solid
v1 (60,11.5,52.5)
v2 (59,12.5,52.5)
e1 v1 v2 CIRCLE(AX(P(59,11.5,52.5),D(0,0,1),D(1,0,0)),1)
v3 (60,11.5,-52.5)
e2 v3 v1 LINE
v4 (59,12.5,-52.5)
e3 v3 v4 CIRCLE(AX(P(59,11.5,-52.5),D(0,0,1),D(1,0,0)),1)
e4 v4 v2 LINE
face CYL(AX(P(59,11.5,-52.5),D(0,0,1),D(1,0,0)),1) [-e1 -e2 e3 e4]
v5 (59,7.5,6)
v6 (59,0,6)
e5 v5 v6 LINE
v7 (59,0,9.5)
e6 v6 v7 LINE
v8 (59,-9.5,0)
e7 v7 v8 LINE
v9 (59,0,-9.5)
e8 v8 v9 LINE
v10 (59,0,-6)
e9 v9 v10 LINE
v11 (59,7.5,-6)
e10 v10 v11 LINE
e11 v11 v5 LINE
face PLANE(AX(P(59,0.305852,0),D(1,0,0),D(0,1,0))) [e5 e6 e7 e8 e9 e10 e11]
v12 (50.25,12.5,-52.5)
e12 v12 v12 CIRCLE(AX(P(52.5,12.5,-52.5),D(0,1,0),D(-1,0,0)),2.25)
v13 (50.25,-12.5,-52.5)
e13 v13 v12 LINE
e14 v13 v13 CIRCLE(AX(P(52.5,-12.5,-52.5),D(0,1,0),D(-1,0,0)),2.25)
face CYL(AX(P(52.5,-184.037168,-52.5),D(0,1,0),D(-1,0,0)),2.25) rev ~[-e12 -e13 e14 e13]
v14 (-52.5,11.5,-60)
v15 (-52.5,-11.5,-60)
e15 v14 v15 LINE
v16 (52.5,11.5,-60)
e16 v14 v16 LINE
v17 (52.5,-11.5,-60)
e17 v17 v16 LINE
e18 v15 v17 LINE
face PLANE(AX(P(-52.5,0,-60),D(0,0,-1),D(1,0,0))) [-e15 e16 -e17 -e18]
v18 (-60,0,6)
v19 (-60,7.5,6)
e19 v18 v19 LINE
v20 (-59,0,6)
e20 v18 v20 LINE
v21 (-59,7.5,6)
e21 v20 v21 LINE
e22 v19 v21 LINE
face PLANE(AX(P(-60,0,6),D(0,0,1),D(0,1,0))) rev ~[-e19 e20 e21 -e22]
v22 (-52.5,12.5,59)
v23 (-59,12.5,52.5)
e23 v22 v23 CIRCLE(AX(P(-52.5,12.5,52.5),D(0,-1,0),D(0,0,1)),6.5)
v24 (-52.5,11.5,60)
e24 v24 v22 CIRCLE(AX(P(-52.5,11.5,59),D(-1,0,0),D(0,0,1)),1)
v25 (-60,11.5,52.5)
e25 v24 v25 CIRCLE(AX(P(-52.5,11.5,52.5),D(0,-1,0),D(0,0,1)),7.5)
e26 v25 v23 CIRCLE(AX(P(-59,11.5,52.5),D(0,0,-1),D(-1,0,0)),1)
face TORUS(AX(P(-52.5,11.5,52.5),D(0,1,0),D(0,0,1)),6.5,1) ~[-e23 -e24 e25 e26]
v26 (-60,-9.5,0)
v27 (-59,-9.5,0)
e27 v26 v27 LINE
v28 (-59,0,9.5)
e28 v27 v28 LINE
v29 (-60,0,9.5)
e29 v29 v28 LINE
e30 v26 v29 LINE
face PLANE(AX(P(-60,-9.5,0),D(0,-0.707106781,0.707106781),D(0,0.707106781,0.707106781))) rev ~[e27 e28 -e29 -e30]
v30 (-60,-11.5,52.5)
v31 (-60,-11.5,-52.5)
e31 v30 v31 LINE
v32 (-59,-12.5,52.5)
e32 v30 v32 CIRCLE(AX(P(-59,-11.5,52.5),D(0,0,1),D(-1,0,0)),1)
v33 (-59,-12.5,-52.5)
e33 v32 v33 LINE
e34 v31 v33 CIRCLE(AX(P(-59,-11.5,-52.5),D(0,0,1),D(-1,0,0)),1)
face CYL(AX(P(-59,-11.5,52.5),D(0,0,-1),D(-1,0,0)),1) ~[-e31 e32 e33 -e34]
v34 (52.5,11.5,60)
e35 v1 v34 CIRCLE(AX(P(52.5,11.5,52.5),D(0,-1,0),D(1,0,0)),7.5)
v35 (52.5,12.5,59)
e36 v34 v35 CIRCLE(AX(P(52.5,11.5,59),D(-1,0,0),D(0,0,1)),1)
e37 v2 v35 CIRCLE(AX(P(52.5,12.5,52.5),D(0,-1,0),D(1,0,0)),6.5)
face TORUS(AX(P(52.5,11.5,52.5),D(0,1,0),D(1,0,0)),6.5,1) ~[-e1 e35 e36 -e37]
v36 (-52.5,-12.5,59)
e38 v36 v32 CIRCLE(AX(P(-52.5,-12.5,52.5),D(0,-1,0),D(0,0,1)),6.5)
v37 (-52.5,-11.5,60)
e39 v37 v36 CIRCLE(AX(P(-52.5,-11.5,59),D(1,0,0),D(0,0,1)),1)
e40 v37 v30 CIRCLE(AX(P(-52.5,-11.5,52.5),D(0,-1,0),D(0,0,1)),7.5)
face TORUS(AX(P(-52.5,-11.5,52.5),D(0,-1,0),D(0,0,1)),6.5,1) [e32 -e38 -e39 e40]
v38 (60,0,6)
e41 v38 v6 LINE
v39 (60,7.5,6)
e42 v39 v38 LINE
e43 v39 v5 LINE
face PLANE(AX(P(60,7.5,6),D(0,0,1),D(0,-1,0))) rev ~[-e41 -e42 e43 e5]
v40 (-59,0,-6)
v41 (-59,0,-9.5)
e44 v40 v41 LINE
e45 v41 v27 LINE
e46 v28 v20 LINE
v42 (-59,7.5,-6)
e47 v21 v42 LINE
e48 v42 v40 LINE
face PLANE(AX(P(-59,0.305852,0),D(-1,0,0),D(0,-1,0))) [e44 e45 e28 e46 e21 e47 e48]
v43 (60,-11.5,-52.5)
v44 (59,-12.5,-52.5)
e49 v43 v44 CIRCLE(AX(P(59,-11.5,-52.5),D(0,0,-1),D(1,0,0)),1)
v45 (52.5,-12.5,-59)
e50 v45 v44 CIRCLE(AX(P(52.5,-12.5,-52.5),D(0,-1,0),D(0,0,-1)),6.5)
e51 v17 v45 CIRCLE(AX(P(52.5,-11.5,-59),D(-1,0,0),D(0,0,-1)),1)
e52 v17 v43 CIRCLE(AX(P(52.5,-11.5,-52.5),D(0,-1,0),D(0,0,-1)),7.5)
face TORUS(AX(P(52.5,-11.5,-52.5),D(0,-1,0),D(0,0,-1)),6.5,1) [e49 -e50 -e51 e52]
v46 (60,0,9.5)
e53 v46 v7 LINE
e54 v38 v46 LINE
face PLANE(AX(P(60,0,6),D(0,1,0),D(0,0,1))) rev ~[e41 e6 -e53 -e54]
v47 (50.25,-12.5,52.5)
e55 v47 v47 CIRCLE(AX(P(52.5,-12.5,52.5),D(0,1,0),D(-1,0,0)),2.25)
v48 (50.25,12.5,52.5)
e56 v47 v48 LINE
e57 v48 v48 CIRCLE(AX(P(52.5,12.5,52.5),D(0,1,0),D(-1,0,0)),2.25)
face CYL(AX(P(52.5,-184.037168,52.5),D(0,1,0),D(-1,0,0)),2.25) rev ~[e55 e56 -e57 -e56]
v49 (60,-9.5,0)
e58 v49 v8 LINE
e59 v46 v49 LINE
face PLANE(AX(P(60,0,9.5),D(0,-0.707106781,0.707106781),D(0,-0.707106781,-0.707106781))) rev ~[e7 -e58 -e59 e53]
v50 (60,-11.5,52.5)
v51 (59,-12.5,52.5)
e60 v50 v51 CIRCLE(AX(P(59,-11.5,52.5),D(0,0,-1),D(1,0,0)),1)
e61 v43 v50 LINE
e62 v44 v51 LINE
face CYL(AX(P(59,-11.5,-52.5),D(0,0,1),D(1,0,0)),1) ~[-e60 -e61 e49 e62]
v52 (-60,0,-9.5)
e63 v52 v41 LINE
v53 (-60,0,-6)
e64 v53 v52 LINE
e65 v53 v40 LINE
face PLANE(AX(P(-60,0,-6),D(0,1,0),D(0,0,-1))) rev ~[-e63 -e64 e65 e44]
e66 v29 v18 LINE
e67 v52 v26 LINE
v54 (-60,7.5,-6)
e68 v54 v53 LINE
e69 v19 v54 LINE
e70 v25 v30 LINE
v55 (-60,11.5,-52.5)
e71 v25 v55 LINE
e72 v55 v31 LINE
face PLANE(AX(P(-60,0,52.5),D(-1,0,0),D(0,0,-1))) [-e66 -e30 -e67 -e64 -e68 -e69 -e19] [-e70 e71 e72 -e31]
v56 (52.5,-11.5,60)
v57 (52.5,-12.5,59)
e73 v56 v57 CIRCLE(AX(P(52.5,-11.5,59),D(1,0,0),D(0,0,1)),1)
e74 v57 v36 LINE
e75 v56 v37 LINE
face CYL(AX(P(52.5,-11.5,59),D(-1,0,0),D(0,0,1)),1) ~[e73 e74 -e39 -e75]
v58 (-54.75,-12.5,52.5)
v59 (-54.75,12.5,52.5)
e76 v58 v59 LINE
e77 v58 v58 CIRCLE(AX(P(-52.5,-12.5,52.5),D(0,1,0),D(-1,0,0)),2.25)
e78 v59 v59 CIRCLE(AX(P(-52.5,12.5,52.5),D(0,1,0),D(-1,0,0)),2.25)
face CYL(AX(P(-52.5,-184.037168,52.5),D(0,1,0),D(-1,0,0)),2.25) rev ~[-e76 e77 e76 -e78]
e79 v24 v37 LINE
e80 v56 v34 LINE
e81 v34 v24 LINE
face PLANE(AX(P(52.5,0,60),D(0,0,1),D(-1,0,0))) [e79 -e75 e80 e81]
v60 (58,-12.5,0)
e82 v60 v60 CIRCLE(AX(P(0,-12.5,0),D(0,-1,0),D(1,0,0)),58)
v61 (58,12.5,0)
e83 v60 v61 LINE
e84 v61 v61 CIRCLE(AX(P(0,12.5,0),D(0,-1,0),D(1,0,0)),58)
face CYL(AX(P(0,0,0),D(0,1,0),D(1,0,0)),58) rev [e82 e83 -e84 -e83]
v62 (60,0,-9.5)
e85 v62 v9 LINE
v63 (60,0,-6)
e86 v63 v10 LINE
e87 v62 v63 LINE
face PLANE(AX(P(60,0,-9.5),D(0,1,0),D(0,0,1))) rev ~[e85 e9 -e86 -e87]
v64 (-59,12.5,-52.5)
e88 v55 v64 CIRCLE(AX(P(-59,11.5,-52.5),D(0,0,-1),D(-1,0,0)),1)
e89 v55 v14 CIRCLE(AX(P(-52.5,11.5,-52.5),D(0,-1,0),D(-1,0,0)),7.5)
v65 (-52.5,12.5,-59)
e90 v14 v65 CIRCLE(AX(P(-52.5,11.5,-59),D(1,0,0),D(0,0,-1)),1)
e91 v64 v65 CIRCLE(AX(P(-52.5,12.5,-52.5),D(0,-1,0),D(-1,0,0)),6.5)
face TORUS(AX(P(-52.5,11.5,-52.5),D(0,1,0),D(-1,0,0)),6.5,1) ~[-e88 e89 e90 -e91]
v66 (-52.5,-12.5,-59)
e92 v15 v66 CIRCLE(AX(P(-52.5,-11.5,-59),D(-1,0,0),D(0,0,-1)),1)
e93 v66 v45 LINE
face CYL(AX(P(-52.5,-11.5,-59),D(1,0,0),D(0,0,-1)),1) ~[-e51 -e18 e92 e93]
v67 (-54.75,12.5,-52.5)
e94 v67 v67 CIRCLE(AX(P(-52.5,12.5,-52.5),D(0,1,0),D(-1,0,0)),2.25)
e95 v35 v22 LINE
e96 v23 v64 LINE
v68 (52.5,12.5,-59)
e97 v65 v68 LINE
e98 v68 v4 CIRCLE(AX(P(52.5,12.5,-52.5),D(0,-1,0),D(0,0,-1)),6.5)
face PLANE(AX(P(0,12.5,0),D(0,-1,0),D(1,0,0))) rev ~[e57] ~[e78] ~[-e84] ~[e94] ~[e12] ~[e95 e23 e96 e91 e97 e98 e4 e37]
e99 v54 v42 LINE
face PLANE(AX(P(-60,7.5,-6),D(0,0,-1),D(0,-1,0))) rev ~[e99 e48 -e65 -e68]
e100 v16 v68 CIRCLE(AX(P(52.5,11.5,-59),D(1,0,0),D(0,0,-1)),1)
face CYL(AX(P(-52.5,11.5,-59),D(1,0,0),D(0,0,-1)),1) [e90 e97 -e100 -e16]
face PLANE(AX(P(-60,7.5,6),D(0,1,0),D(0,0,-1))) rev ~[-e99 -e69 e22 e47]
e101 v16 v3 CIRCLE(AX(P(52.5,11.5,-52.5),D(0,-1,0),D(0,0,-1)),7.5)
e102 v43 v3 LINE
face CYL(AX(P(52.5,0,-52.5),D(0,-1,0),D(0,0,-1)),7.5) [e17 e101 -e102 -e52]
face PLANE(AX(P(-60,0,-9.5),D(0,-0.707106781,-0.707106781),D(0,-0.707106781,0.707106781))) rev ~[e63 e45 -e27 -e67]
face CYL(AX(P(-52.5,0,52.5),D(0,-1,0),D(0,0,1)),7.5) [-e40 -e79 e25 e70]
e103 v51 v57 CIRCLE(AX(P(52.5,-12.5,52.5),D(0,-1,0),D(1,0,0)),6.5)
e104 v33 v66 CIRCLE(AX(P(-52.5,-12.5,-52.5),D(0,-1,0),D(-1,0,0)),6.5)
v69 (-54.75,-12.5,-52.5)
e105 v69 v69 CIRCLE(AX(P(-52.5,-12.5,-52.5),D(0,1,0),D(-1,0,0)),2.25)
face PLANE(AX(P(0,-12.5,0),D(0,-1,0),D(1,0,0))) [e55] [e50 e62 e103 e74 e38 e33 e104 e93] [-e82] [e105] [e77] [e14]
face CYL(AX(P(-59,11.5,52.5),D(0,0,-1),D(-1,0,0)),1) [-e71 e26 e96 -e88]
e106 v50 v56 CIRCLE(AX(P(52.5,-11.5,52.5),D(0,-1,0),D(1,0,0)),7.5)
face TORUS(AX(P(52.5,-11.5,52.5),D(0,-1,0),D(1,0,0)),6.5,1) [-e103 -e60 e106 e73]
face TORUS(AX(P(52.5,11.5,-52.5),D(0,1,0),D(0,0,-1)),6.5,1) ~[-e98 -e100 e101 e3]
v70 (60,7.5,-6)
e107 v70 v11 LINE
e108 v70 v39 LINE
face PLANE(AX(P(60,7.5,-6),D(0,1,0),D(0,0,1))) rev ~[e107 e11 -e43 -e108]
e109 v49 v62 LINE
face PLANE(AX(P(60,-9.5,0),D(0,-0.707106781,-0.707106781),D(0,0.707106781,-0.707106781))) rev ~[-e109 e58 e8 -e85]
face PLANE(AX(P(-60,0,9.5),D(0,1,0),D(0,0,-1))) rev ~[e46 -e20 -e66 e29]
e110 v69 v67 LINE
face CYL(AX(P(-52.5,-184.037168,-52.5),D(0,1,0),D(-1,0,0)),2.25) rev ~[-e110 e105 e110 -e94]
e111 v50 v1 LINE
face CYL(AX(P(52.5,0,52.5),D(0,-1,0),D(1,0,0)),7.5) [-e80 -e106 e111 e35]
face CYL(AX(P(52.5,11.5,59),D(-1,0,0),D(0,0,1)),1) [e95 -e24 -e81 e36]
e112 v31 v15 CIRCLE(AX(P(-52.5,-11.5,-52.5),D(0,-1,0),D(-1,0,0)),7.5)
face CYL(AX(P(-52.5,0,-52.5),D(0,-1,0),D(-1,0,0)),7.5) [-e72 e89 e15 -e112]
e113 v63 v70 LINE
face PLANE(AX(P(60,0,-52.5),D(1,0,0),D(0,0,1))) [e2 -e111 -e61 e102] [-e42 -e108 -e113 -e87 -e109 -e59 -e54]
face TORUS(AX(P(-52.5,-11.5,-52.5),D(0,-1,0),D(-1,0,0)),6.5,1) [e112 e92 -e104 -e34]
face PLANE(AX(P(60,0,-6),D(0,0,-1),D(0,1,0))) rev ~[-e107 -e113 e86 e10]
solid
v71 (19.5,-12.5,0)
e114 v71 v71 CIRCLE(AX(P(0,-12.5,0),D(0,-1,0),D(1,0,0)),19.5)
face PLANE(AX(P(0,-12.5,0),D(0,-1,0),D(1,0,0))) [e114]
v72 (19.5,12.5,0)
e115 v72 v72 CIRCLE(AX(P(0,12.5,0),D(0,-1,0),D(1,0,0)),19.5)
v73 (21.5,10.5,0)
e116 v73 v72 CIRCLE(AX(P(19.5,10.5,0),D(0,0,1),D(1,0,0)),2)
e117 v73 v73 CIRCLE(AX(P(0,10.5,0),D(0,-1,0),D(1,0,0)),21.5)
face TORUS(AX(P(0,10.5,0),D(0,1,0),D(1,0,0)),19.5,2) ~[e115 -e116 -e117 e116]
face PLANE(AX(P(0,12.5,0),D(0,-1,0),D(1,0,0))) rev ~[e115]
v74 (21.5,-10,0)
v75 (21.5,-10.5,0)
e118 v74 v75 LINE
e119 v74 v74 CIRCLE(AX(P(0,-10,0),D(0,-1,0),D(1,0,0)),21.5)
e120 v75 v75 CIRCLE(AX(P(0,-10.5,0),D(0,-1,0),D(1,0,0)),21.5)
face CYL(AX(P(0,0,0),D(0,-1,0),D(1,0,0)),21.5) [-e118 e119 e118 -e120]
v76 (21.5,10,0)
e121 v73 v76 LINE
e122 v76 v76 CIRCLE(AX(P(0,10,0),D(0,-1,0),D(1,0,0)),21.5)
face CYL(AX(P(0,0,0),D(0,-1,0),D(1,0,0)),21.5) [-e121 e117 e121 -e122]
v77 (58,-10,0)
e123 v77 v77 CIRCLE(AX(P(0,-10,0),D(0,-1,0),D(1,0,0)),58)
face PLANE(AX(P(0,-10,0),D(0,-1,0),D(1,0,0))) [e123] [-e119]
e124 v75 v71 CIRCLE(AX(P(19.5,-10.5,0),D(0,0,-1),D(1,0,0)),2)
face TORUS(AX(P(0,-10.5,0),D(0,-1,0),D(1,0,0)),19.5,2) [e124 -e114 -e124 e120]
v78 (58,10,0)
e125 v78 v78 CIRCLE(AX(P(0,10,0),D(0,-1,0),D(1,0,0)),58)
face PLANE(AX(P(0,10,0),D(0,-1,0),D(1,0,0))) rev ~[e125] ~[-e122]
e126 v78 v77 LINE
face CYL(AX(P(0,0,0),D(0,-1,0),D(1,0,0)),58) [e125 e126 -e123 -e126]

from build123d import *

# Parameters (mm, degrees)
F0_R      = 58
F1_DEPTH  = 12.5
F0_R_2    = 21.5
F2_DEPTH  = 10
F3_R      = 2
F4_R      = 1
F6_D      = 4.5
F8_DEPTH  = 1
F10_DEPTH = 1


with BuildPart() as f1:
    # F0 (on Front) → F1 (new body, symmetric)
    with BuildSketch(Plane.XZ):
        with BuildLine():
            Line((52.5, 60), (-52.5, 60))
            ThreePointArc((-52.5, 60), (-57.8033008589, 57.8033008589), (-60, 52.5))
            Line((-60, 52.5), (-60, -52.5))
            ThreePointArc((-60, -52.5), (-57.8033008589, -57.8033008589), (-52.5, -60))
            Line((-52.5, -60), (52.5, -60))
            ThreePointArc((52.5, -60), (57.8033008589, -57.8033008589), (60, -52.5))
            Line((60, -52.5), (60, 52.5))
            ThreePointArc((60, 52.5), (57.8033008589, 57.8033008589), (52.5, 60))
        make_face()
        Circle(F0_R, mode=Mode.SUBTRACT)
    extrude(amount=F1_DEPTH, both=True)

    # F4
    f4_edges = [f1.edges().sort_by_distance(p)[0] for p in [
        (-60, -12.5, 0),
        (-57.803301, -12.5, -57.803301),
        (0, -12.5, -60),
        (57.803301, -12.5, -57.803301),
        (60, -12.5, 0),
        (57.803301, -12.5, 57.803301),
        (0, -12.5, 60),
        (-57.803301, -12.5, 57.803301),
        (-57.803301, 12.5, -57.803301),
        (0, 12.5, -60),
        (57.803301, 12.5, -57.803301),
        (-60, 12.5, 0),
        (60, 12.5, 0),
        (57.803301, 12.5, 57.803301),
        (0, 12.5, 60),
        (-57.803301, 12.5, 57.803301),
    ]]
    fillet(f4_edges, radius=F4_R)

    # F6 (through all)
    with Locations(Plane.XZ.offset(12.5)):
        with Locations((-52.5, 52.5), (52.5, 52.5), (52.5, -52.5), (-52.5, -52.5)):
            Hole(F6_D / 2)

    # F7 (on face) → F8 (cut)
    with BuildSketch(Plane(origin=(-60, 0, 0), x_dir=(0, -1, 0), z_dir=(-1, 0, 0))):
        Polygon((0, -9.5), (9.5, 0), (0, 9.5), (0, 6), (-7.5, 6), (-7.5, 0), (-7.5, -6), (0, -6), align=None)
    extrude(amount=-F8_DEPTH, mode=Mode.SUBTRACT)

    # F9 (on face) → F10 (cut)
    with BuildSketch(Plane.YZ.offset(60)):
        Polygon((0, 9.5), (-9.5, 0), (0, -9.5), (0, -6), (7.5, -6), (7.5, 0), (7.5, 6), (0, 6), align=None)
    extrude(amount=-F10_DEPTH, mode=Mode.SUBTRACT)


with BuildPart() as f1b:
    # F0 (on Front) → F1, piece 2 (new body, symmetric)
    with BuildSketch(Plane.XZ):
        Circle(F0_R_2)
    extrude(amount=F1_DEPTH, both=True)

    # F0 (on Front) → F2 (join, symmetric)
    with BuildSketch(Plane.XZ):
        Circle(F0_R)
        Circle(F0_R_2, mode=Mode.SUBTRACT)
    extrude(amount=F2_DEPTH, both=True)

    # F3
    f3_edges = [f1b.edges().sort_by_distance(p)[0] for p in [
        (-21.5, -12.5, 0),
        (-21.5, 12.5, 0),
    ]]
    fillet(f3_edges, radius=F3_R)


solid = Compound([f1.part, f1b.part])
